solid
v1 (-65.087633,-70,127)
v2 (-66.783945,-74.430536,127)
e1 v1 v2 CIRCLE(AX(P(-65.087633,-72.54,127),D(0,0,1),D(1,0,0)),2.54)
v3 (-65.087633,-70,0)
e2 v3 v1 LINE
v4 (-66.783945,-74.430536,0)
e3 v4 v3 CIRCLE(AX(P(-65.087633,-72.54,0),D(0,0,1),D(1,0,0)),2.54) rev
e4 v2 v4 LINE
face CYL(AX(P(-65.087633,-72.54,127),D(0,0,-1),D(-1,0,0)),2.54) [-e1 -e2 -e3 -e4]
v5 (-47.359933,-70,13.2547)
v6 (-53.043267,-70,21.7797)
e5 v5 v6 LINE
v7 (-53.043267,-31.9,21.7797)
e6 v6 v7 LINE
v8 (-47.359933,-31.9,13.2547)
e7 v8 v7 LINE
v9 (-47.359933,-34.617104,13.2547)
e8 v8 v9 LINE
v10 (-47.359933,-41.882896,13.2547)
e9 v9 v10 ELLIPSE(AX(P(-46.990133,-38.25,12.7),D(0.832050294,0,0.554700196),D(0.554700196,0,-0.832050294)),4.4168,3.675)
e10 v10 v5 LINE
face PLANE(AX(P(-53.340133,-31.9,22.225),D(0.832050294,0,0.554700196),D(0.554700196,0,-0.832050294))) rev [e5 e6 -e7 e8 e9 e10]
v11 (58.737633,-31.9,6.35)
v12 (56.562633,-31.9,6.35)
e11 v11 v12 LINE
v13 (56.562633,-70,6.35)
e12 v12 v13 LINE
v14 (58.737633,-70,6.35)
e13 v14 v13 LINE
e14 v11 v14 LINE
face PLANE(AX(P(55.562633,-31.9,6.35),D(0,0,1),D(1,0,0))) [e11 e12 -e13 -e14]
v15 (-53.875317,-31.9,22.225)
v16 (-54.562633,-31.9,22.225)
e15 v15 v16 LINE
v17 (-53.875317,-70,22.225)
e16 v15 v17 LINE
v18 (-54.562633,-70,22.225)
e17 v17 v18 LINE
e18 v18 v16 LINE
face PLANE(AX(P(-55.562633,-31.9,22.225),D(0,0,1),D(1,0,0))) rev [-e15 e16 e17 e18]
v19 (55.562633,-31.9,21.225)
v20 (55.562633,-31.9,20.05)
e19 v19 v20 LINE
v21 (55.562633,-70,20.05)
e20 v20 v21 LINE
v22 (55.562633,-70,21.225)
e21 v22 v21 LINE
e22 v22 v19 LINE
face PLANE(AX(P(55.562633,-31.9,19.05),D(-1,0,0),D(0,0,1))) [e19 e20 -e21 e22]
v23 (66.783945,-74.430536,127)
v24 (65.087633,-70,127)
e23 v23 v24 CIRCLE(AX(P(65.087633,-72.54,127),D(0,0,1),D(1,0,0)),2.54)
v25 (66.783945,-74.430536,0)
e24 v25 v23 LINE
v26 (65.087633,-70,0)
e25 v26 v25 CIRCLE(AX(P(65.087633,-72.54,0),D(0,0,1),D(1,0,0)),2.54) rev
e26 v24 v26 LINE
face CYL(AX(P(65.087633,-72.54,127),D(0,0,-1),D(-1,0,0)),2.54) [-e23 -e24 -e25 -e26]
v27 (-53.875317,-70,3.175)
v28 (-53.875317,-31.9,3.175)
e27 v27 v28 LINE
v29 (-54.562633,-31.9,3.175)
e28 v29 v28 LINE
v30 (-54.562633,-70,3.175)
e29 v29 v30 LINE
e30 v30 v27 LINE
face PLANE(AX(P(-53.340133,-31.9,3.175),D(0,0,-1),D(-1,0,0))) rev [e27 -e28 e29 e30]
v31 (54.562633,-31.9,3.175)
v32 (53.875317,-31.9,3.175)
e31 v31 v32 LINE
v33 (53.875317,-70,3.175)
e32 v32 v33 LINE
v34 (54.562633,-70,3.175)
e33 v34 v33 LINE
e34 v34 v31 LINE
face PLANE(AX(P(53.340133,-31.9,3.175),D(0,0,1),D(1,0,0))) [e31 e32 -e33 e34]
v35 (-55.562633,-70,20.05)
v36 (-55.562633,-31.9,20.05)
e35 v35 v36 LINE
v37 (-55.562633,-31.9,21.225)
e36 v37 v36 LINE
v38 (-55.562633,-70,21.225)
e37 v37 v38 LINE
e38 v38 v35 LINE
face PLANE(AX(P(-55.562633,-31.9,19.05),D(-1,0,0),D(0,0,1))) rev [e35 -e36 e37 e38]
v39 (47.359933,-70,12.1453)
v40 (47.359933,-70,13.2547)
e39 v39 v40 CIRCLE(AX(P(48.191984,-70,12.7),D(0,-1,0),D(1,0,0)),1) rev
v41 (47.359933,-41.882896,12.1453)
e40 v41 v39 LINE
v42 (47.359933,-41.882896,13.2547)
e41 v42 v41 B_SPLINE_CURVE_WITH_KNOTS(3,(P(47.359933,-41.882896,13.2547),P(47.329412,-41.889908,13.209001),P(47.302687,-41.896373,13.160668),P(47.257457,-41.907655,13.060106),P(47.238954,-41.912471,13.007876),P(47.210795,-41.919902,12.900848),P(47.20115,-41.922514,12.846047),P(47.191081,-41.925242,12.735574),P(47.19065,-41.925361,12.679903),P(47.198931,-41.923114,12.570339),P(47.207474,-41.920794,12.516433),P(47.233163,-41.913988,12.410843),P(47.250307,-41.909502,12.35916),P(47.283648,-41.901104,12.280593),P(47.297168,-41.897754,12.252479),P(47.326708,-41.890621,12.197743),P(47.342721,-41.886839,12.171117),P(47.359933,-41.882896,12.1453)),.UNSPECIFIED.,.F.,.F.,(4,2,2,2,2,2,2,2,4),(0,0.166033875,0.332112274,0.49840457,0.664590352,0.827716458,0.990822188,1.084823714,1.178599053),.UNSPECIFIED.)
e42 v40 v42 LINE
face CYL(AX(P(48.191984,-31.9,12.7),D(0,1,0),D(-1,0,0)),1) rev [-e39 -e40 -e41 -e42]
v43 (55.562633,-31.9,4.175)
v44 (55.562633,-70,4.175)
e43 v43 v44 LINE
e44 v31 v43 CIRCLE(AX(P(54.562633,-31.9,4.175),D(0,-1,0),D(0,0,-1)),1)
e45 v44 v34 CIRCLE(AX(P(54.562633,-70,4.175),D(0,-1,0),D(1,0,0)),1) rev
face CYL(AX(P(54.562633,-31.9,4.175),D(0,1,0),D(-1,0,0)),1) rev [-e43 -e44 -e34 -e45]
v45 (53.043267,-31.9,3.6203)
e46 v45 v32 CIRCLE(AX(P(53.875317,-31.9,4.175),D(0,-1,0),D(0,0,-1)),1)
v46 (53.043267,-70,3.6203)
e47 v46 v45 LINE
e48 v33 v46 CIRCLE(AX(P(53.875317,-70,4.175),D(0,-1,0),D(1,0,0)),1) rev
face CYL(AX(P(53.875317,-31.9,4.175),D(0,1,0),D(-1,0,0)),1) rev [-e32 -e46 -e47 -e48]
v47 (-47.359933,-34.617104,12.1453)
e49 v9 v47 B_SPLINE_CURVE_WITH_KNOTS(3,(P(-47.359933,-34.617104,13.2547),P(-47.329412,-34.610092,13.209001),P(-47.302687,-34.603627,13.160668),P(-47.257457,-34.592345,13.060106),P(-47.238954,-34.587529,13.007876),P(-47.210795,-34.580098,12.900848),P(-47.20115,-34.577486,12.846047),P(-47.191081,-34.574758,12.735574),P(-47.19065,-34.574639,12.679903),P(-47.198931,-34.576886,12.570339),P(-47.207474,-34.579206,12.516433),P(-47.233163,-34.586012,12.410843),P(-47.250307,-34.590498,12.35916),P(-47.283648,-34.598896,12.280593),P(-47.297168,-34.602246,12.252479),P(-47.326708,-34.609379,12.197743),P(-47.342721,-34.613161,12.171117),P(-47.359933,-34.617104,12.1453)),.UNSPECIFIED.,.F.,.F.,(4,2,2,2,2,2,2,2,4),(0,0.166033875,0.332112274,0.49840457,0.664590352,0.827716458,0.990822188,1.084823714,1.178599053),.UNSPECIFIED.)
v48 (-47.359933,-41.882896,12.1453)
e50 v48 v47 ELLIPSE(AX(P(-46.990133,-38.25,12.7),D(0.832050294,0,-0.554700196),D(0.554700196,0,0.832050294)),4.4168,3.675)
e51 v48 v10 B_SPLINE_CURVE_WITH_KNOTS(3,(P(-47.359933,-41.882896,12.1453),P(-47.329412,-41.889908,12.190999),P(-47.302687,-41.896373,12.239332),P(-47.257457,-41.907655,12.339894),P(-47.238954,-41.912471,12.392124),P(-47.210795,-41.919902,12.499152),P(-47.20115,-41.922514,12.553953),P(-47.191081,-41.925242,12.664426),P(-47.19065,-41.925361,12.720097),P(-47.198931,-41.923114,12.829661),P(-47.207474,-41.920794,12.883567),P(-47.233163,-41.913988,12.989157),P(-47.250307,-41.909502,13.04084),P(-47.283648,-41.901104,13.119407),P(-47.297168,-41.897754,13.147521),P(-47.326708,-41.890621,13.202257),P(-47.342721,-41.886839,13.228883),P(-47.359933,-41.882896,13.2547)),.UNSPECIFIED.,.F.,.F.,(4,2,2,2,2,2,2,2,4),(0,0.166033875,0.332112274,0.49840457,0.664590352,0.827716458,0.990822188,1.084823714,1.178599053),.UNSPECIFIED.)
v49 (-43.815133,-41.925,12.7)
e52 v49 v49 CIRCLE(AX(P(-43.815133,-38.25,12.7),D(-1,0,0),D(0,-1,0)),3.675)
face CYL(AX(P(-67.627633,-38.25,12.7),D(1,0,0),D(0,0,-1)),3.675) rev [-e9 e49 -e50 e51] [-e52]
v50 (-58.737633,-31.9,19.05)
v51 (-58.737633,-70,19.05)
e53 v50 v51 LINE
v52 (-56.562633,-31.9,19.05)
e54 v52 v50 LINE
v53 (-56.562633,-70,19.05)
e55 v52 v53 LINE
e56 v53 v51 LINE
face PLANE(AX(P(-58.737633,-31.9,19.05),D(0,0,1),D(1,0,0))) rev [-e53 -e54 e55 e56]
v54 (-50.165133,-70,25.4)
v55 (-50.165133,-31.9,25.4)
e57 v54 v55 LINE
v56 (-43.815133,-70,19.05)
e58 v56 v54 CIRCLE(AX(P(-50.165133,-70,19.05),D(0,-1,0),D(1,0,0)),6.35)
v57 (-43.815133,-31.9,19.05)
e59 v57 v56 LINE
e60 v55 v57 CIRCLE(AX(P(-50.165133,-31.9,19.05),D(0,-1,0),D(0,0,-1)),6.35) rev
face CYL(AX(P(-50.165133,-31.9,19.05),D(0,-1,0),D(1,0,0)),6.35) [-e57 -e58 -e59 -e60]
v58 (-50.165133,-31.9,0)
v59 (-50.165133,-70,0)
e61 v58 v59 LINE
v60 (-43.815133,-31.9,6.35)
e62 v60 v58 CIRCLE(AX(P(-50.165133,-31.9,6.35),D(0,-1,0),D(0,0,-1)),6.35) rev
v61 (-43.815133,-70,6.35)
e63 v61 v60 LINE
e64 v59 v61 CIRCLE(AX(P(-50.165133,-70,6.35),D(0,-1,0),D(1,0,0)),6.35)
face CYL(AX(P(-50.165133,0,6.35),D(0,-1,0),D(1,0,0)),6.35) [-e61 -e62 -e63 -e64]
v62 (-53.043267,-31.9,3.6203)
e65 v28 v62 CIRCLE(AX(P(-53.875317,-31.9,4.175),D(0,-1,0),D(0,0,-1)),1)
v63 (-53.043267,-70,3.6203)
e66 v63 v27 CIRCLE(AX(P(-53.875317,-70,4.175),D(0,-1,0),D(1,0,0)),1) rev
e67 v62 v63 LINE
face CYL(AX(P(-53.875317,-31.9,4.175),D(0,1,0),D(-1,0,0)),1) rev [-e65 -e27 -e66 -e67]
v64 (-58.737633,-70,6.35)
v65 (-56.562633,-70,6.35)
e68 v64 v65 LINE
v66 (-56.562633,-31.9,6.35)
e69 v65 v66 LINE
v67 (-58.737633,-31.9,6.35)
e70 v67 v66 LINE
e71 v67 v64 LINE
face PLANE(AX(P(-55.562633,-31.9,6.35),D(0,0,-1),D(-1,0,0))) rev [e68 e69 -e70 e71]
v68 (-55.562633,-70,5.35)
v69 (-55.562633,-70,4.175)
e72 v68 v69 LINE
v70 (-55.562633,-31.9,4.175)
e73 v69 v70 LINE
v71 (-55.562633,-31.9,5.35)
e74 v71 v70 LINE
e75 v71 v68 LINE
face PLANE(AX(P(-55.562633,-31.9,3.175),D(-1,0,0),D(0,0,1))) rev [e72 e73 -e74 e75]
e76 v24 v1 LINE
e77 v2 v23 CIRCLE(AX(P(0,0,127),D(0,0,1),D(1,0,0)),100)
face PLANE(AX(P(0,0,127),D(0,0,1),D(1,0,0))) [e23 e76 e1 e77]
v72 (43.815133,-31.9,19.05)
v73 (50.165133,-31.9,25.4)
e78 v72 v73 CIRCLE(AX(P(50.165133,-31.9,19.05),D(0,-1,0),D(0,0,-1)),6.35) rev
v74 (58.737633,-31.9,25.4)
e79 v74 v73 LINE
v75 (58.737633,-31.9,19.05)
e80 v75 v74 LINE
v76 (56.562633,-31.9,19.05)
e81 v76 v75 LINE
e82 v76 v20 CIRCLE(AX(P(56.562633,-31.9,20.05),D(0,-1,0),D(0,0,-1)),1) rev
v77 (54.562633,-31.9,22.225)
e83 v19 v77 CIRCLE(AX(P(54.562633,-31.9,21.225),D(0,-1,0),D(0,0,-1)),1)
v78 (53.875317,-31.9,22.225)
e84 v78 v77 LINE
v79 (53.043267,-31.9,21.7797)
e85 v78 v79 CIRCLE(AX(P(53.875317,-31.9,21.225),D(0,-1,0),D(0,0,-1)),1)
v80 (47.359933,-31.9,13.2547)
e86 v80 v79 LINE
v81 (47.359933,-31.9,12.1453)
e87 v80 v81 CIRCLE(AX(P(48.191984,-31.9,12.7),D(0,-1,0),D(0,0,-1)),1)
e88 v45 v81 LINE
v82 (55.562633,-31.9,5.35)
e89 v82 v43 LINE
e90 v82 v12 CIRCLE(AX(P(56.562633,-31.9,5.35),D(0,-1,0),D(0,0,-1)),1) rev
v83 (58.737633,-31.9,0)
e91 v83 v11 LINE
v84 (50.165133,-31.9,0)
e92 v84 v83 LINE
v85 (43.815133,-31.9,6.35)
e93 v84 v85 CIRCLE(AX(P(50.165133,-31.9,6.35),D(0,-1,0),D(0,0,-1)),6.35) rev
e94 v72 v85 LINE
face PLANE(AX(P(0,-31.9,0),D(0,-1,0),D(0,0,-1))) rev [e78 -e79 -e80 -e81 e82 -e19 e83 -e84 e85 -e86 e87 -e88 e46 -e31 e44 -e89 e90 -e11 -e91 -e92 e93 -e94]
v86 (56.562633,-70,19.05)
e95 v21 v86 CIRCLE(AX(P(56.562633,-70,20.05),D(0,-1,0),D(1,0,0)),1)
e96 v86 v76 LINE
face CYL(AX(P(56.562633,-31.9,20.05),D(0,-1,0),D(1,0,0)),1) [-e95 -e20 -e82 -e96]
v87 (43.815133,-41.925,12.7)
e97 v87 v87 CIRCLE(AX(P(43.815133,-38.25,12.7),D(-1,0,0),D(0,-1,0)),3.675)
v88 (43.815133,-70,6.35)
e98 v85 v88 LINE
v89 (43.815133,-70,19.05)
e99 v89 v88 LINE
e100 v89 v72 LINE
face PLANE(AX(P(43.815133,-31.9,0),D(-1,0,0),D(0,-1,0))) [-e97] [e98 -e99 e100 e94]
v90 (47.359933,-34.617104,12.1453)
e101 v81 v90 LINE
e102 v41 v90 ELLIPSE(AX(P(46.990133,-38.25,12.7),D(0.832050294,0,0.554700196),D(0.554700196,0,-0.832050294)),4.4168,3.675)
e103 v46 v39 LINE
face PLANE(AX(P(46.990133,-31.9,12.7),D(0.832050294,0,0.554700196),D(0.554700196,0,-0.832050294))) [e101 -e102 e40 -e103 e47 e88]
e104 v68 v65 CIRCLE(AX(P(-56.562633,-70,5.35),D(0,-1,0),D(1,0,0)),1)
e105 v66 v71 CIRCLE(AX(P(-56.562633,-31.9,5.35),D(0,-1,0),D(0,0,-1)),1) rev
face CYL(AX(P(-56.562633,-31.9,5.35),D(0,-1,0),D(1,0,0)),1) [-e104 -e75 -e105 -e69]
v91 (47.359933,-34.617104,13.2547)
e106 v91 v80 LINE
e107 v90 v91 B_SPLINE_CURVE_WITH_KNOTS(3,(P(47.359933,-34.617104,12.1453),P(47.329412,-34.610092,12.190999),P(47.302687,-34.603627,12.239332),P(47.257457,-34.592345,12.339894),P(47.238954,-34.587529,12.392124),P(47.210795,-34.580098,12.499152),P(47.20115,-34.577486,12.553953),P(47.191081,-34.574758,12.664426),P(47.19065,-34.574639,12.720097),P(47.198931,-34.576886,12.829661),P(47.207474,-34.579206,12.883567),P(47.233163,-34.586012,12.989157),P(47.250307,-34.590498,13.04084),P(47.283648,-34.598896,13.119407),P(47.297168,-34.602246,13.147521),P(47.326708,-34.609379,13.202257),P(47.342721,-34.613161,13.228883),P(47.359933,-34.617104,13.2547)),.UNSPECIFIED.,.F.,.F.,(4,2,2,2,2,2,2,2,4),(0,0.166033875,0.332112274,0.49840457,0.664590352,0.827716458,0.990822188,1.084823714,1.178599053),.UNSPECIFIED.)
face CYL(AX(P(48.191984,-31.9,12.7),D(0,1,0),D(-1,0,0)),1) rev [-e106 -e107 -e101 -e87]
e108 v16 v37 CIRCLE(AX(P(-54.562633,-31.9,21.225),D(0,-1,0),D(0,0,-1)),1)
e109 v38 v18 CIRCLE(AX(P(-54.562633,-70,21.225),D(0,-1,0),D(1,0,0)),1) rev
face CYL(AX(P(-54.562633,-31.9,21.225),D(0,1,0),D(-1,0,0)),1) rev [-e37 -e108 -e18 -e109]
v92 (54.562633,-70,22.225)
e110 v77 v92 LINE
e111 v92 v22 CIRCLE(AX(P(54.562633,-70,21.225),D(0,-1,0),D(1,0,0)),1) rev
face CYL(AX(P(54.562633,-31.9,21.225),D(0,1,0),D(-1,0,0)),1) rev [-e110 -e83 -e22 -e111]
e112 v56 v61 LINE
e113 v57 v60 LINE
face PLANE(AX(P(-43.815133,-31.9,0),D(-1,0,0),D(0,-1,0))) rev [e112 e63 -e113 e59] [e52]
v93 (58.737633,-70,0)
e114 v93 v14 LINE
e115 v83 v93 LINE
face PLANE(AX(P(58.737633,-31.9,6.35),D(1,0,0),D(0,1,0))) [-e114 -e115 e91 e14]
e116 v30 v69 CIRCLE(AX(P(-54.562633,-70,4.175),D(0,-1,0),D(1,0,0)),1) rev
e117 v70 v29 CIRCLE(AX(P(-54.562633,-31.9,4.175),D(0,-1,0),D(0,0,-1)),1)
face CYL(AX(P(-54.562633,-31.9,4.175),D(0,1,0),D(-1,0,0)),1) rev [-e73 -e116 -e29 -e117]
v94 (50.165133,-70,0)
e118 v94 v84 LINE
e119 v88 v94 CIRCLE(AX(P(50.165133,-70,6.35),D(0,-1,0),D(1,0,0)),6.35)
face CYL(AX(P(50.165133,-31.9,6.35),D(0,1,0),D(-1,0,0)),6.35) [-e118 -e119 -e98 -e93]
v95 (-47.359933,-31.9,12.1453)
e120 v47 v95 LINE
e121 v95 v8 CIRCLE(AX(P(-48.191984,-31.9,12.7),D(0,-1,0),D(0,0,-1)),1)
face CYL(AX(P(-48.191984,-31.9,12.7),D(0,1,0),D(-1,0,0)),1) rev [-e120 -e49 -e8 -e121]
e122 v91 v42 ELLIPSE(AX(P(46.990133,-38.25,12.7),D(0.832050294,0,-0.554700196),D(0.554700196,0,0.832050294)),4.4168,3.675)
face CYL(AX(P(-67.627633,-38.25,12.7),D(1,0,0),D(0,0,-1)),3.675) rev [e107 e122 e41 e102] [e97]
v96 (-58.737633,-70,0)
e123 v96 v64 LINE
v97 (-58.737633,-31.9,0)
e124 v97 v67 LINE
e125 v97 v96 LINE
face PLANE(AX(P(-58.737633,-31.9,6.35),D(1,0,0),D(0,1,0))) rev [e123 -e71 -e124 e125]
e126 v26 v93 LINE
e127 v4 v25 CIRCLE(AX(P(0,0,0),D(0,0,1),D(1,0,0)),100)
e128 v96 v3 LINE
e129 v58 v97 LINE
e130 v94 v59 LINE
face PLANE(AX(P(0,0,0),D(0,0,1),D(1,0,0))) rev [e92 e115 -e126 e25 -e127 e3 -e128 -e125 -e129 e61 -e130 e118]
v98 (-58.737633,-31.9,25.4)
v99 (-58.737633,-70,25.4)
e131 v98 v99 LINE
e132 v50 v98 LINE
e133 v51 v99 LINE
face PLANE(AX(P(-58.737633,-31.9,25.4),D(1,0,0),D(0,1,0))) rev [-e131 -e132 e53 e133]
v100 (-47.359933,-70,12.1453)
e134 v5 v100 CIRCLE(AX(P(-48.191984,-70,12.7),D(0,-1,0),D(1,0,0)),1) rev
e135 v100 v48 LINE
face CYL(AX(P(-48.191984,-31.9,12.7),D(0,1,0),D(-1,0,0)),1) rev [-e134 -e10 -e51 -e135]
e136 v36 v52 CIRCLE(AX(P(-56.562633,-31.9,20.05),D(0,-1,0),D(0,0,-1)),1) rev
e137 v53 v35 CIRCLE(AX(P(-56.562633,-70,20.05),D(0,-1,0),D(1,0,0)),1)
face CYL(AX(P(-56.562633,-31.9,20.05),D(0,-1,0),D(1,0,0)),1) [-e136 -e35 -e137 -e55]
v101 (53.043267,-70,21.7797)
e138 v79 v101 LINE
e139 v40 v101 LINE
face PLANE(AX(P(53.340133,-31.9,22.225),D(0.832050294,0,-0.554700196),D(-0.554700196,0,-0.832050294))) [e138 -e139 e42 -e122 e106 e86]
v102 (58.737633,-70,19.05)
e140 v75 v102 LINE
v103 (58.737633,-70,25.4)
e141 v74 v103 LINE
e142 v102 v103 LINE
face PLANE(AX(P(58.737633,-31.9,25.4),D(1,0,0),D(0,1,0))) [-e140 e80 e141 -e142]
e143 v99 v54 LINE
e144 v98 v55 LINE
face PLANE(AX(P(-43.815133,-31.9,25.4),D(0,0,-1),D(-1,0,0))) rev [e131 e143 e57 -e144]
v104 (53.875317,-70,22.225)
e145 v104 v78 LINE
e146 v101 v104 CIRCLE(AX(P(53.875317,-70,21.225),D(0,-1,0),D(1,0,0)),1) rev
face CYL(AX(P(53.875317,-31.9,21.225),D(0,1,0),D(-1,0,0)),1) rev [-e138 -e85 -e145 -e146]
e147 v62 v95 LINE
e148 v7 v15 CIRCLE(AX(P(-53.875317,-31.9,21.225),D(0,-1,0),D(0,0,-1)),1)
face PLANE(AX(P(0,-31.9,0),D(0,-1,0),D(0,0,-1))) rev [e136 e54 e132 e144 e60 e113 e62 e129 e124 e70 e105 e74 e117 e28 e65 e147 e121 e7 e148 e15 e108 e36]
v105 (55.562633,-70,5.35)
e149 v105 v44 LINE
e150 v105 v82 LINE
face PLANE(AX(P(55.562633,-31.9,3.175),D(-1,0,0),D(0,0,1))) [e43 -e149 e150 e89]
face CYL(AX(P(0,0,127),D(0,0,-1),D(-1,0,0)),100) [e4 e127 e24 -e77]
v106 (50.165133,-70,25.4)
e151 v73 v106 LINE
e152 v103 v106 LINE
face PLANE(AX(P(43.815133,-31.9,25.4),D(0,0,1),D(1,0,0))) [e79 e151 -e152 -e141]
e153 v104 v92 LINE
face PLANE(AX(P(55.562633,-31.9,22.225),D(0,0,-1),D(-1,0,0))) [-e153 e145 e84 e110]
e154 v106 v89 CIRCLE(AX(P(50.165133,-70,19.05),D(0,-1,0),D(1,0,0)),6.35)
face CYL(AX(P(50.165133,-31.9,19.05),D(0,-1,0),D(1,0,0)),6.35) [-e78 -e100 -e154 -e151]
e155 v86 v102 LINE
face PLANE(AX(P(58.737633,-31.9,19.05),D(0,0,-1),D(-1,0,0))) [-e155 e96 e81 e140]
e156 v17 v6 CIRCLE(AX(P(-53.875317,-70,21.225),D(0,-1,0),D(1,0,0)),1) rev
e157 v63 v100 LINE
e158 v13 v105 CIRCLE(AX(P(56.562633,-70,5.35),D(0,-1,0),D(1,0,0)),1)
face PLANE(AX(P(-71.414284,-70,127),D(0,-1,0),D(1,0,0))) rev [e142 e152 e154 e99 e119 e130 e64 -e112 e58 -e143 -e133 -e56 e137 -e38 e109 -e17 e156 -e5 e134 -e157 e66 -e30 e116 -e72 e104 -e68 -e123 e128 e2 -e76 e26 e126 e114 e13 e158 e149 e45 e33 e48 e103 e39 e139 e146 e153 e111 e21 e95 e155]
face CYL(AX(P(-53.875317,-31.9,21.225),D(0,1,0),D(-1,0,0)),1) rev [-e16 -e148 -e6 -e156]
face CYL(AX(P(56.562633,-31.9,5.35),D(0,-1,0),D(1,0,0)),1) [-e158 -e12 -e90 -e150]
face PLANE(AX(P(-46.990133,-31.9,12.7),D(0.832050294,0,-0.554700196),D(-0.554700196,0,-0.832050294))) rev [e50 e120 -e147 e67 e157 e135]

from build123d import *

# Parameters (mm, degrees)
BOSS_EXTRUDE1_DEPTH     = 127
FILLET1_R               = 2.54
BOSS_EXTRUDE2_DEPTH     = 38.1
CUT_EXTRUDE1_DEPTH      = 176.221279464
CUT_EXTRUDE1_DEPTH_BACK = 176.221279464
SKETCH4_R               = 3.675
FILLET2_R               = 1
FILLET3_R               = 6.35


with BuildPart() as part:
    # Sketch1 → Boss-Extrude1 (new body)
    with BuildSketch(Plane.XY):
        with BuildLine():
            Line((-71.414284285, -70), (71.414284285, -70))
            ThreePointArc((71.414284285, -70), (0, -100), (-71.414284285, -70))
        make_face()
    extrude(amount=BOSS_EXTRUDE1_DEPTH)

    # Fillet1
    fillet1_edges = [part.edges().sort_by_distance(p)[0] for p in [
        (-71.414284285, -70, 63.5),
        (71.414284285, -70, 63.5),
    ]]
    fillet(fillet1_edges, radius=FILLET1_R)

    # Sketch2 → Boss-Extrude2 (add)
    with BuildSketch(Plane(origin=(0, -70, 0), x_dir=(1, 0, 0), z_dir=(0, 1, 0))):
        Polygon((-58.737633234, -6.35), (-58.737633234, 0), (-43.815133234, 0), (-43.815133234, -25.4), (-58.737633234, -25.4), (-58.737633234, -19.05), (-55.562633234, -19.05), (-55.562633234, -22.225), (-53.340133234, -22.225), (-46.990133234, -12.7), (-53.340133234, -3.175), (-55.562633234, -3.175), (-55.562633234, -6.35), align=None)
    boss_extrude2 = extrude(amount=BOSS_EXTRUDE2_DEPTH)

    # Mirror1: Boss-Extrude2 across plane
    add(boss_extrude2.mirror(Plane(origin=(0, 0, 0), x_dir=(0, 0, 1), z_dir=(1, 0, 0))))

    # Sketch4 → Cut-Extrude1 (cut, two sides: drawn at the far end of the back side and taken through both)
    with BuildSketch(Plane(origin=(0, 0, 0), x_dir=(0, 0, -1), z_dir=(1, 0, 0)).offset(-CUT_EXTRUDE1_DEPTH_BACK)):
        with Locations((-12.7, -38.25)):
            Circle(SKETCH4_R)
    extrude(amount=CUT_EXTRUDE1_DEPTH + CUT_EXTRUDE1_DEPTH_BACK, mode=Mode.SUBTRACT)

    # Fillet2
    fillet2_edges = [part.edges().sort_by_distance(p)[0] for p in [
        (55.562633234, -50.95, 3.175),
        (53.340133234, -50.95, 3.175),
        (55.562633234, -50.95, 19.05),
        (55.562633234, -50.95, 6.35),
        (46.990133234, -33.2375, 12.7),
        (46.990133234, -55.9625, 12.7),
        (53.340133234, -50.95, 22.225),
        (55.562633234, -50.95, 22.225),
        (-53.340133234, -50.95, 22.225),
        (-55.562633234, -50.95, 19.05),
        (-55.562633234, -50.95, 22.225),
        (-46.990133234, -55.9625, 12.7),
        (-46.990133234, -33.2375, 12.7),
        (-53.340133234, -50.95, 3.175),
        (-55.562633234, -50.95, 3.175),
        (-55.562633234, -50.95, 6.35),
    ]]
    fillet(fillet2_edges, radius=FILLET2_R)

    # Fillet3
    fillet3_edges = [part.edges().sort_by_distance(p)[0] for p in [
        (43.815133234, -50.95, 0),
        (43.815133234, -50.95, 25.4),
        (-43.815133234, -50.95, 0),
        (-43.815133234, -50.95, 25.4),
    ]]
    fillet(fillet3_edges, radius=FILLET3_R)


solid = part.part
